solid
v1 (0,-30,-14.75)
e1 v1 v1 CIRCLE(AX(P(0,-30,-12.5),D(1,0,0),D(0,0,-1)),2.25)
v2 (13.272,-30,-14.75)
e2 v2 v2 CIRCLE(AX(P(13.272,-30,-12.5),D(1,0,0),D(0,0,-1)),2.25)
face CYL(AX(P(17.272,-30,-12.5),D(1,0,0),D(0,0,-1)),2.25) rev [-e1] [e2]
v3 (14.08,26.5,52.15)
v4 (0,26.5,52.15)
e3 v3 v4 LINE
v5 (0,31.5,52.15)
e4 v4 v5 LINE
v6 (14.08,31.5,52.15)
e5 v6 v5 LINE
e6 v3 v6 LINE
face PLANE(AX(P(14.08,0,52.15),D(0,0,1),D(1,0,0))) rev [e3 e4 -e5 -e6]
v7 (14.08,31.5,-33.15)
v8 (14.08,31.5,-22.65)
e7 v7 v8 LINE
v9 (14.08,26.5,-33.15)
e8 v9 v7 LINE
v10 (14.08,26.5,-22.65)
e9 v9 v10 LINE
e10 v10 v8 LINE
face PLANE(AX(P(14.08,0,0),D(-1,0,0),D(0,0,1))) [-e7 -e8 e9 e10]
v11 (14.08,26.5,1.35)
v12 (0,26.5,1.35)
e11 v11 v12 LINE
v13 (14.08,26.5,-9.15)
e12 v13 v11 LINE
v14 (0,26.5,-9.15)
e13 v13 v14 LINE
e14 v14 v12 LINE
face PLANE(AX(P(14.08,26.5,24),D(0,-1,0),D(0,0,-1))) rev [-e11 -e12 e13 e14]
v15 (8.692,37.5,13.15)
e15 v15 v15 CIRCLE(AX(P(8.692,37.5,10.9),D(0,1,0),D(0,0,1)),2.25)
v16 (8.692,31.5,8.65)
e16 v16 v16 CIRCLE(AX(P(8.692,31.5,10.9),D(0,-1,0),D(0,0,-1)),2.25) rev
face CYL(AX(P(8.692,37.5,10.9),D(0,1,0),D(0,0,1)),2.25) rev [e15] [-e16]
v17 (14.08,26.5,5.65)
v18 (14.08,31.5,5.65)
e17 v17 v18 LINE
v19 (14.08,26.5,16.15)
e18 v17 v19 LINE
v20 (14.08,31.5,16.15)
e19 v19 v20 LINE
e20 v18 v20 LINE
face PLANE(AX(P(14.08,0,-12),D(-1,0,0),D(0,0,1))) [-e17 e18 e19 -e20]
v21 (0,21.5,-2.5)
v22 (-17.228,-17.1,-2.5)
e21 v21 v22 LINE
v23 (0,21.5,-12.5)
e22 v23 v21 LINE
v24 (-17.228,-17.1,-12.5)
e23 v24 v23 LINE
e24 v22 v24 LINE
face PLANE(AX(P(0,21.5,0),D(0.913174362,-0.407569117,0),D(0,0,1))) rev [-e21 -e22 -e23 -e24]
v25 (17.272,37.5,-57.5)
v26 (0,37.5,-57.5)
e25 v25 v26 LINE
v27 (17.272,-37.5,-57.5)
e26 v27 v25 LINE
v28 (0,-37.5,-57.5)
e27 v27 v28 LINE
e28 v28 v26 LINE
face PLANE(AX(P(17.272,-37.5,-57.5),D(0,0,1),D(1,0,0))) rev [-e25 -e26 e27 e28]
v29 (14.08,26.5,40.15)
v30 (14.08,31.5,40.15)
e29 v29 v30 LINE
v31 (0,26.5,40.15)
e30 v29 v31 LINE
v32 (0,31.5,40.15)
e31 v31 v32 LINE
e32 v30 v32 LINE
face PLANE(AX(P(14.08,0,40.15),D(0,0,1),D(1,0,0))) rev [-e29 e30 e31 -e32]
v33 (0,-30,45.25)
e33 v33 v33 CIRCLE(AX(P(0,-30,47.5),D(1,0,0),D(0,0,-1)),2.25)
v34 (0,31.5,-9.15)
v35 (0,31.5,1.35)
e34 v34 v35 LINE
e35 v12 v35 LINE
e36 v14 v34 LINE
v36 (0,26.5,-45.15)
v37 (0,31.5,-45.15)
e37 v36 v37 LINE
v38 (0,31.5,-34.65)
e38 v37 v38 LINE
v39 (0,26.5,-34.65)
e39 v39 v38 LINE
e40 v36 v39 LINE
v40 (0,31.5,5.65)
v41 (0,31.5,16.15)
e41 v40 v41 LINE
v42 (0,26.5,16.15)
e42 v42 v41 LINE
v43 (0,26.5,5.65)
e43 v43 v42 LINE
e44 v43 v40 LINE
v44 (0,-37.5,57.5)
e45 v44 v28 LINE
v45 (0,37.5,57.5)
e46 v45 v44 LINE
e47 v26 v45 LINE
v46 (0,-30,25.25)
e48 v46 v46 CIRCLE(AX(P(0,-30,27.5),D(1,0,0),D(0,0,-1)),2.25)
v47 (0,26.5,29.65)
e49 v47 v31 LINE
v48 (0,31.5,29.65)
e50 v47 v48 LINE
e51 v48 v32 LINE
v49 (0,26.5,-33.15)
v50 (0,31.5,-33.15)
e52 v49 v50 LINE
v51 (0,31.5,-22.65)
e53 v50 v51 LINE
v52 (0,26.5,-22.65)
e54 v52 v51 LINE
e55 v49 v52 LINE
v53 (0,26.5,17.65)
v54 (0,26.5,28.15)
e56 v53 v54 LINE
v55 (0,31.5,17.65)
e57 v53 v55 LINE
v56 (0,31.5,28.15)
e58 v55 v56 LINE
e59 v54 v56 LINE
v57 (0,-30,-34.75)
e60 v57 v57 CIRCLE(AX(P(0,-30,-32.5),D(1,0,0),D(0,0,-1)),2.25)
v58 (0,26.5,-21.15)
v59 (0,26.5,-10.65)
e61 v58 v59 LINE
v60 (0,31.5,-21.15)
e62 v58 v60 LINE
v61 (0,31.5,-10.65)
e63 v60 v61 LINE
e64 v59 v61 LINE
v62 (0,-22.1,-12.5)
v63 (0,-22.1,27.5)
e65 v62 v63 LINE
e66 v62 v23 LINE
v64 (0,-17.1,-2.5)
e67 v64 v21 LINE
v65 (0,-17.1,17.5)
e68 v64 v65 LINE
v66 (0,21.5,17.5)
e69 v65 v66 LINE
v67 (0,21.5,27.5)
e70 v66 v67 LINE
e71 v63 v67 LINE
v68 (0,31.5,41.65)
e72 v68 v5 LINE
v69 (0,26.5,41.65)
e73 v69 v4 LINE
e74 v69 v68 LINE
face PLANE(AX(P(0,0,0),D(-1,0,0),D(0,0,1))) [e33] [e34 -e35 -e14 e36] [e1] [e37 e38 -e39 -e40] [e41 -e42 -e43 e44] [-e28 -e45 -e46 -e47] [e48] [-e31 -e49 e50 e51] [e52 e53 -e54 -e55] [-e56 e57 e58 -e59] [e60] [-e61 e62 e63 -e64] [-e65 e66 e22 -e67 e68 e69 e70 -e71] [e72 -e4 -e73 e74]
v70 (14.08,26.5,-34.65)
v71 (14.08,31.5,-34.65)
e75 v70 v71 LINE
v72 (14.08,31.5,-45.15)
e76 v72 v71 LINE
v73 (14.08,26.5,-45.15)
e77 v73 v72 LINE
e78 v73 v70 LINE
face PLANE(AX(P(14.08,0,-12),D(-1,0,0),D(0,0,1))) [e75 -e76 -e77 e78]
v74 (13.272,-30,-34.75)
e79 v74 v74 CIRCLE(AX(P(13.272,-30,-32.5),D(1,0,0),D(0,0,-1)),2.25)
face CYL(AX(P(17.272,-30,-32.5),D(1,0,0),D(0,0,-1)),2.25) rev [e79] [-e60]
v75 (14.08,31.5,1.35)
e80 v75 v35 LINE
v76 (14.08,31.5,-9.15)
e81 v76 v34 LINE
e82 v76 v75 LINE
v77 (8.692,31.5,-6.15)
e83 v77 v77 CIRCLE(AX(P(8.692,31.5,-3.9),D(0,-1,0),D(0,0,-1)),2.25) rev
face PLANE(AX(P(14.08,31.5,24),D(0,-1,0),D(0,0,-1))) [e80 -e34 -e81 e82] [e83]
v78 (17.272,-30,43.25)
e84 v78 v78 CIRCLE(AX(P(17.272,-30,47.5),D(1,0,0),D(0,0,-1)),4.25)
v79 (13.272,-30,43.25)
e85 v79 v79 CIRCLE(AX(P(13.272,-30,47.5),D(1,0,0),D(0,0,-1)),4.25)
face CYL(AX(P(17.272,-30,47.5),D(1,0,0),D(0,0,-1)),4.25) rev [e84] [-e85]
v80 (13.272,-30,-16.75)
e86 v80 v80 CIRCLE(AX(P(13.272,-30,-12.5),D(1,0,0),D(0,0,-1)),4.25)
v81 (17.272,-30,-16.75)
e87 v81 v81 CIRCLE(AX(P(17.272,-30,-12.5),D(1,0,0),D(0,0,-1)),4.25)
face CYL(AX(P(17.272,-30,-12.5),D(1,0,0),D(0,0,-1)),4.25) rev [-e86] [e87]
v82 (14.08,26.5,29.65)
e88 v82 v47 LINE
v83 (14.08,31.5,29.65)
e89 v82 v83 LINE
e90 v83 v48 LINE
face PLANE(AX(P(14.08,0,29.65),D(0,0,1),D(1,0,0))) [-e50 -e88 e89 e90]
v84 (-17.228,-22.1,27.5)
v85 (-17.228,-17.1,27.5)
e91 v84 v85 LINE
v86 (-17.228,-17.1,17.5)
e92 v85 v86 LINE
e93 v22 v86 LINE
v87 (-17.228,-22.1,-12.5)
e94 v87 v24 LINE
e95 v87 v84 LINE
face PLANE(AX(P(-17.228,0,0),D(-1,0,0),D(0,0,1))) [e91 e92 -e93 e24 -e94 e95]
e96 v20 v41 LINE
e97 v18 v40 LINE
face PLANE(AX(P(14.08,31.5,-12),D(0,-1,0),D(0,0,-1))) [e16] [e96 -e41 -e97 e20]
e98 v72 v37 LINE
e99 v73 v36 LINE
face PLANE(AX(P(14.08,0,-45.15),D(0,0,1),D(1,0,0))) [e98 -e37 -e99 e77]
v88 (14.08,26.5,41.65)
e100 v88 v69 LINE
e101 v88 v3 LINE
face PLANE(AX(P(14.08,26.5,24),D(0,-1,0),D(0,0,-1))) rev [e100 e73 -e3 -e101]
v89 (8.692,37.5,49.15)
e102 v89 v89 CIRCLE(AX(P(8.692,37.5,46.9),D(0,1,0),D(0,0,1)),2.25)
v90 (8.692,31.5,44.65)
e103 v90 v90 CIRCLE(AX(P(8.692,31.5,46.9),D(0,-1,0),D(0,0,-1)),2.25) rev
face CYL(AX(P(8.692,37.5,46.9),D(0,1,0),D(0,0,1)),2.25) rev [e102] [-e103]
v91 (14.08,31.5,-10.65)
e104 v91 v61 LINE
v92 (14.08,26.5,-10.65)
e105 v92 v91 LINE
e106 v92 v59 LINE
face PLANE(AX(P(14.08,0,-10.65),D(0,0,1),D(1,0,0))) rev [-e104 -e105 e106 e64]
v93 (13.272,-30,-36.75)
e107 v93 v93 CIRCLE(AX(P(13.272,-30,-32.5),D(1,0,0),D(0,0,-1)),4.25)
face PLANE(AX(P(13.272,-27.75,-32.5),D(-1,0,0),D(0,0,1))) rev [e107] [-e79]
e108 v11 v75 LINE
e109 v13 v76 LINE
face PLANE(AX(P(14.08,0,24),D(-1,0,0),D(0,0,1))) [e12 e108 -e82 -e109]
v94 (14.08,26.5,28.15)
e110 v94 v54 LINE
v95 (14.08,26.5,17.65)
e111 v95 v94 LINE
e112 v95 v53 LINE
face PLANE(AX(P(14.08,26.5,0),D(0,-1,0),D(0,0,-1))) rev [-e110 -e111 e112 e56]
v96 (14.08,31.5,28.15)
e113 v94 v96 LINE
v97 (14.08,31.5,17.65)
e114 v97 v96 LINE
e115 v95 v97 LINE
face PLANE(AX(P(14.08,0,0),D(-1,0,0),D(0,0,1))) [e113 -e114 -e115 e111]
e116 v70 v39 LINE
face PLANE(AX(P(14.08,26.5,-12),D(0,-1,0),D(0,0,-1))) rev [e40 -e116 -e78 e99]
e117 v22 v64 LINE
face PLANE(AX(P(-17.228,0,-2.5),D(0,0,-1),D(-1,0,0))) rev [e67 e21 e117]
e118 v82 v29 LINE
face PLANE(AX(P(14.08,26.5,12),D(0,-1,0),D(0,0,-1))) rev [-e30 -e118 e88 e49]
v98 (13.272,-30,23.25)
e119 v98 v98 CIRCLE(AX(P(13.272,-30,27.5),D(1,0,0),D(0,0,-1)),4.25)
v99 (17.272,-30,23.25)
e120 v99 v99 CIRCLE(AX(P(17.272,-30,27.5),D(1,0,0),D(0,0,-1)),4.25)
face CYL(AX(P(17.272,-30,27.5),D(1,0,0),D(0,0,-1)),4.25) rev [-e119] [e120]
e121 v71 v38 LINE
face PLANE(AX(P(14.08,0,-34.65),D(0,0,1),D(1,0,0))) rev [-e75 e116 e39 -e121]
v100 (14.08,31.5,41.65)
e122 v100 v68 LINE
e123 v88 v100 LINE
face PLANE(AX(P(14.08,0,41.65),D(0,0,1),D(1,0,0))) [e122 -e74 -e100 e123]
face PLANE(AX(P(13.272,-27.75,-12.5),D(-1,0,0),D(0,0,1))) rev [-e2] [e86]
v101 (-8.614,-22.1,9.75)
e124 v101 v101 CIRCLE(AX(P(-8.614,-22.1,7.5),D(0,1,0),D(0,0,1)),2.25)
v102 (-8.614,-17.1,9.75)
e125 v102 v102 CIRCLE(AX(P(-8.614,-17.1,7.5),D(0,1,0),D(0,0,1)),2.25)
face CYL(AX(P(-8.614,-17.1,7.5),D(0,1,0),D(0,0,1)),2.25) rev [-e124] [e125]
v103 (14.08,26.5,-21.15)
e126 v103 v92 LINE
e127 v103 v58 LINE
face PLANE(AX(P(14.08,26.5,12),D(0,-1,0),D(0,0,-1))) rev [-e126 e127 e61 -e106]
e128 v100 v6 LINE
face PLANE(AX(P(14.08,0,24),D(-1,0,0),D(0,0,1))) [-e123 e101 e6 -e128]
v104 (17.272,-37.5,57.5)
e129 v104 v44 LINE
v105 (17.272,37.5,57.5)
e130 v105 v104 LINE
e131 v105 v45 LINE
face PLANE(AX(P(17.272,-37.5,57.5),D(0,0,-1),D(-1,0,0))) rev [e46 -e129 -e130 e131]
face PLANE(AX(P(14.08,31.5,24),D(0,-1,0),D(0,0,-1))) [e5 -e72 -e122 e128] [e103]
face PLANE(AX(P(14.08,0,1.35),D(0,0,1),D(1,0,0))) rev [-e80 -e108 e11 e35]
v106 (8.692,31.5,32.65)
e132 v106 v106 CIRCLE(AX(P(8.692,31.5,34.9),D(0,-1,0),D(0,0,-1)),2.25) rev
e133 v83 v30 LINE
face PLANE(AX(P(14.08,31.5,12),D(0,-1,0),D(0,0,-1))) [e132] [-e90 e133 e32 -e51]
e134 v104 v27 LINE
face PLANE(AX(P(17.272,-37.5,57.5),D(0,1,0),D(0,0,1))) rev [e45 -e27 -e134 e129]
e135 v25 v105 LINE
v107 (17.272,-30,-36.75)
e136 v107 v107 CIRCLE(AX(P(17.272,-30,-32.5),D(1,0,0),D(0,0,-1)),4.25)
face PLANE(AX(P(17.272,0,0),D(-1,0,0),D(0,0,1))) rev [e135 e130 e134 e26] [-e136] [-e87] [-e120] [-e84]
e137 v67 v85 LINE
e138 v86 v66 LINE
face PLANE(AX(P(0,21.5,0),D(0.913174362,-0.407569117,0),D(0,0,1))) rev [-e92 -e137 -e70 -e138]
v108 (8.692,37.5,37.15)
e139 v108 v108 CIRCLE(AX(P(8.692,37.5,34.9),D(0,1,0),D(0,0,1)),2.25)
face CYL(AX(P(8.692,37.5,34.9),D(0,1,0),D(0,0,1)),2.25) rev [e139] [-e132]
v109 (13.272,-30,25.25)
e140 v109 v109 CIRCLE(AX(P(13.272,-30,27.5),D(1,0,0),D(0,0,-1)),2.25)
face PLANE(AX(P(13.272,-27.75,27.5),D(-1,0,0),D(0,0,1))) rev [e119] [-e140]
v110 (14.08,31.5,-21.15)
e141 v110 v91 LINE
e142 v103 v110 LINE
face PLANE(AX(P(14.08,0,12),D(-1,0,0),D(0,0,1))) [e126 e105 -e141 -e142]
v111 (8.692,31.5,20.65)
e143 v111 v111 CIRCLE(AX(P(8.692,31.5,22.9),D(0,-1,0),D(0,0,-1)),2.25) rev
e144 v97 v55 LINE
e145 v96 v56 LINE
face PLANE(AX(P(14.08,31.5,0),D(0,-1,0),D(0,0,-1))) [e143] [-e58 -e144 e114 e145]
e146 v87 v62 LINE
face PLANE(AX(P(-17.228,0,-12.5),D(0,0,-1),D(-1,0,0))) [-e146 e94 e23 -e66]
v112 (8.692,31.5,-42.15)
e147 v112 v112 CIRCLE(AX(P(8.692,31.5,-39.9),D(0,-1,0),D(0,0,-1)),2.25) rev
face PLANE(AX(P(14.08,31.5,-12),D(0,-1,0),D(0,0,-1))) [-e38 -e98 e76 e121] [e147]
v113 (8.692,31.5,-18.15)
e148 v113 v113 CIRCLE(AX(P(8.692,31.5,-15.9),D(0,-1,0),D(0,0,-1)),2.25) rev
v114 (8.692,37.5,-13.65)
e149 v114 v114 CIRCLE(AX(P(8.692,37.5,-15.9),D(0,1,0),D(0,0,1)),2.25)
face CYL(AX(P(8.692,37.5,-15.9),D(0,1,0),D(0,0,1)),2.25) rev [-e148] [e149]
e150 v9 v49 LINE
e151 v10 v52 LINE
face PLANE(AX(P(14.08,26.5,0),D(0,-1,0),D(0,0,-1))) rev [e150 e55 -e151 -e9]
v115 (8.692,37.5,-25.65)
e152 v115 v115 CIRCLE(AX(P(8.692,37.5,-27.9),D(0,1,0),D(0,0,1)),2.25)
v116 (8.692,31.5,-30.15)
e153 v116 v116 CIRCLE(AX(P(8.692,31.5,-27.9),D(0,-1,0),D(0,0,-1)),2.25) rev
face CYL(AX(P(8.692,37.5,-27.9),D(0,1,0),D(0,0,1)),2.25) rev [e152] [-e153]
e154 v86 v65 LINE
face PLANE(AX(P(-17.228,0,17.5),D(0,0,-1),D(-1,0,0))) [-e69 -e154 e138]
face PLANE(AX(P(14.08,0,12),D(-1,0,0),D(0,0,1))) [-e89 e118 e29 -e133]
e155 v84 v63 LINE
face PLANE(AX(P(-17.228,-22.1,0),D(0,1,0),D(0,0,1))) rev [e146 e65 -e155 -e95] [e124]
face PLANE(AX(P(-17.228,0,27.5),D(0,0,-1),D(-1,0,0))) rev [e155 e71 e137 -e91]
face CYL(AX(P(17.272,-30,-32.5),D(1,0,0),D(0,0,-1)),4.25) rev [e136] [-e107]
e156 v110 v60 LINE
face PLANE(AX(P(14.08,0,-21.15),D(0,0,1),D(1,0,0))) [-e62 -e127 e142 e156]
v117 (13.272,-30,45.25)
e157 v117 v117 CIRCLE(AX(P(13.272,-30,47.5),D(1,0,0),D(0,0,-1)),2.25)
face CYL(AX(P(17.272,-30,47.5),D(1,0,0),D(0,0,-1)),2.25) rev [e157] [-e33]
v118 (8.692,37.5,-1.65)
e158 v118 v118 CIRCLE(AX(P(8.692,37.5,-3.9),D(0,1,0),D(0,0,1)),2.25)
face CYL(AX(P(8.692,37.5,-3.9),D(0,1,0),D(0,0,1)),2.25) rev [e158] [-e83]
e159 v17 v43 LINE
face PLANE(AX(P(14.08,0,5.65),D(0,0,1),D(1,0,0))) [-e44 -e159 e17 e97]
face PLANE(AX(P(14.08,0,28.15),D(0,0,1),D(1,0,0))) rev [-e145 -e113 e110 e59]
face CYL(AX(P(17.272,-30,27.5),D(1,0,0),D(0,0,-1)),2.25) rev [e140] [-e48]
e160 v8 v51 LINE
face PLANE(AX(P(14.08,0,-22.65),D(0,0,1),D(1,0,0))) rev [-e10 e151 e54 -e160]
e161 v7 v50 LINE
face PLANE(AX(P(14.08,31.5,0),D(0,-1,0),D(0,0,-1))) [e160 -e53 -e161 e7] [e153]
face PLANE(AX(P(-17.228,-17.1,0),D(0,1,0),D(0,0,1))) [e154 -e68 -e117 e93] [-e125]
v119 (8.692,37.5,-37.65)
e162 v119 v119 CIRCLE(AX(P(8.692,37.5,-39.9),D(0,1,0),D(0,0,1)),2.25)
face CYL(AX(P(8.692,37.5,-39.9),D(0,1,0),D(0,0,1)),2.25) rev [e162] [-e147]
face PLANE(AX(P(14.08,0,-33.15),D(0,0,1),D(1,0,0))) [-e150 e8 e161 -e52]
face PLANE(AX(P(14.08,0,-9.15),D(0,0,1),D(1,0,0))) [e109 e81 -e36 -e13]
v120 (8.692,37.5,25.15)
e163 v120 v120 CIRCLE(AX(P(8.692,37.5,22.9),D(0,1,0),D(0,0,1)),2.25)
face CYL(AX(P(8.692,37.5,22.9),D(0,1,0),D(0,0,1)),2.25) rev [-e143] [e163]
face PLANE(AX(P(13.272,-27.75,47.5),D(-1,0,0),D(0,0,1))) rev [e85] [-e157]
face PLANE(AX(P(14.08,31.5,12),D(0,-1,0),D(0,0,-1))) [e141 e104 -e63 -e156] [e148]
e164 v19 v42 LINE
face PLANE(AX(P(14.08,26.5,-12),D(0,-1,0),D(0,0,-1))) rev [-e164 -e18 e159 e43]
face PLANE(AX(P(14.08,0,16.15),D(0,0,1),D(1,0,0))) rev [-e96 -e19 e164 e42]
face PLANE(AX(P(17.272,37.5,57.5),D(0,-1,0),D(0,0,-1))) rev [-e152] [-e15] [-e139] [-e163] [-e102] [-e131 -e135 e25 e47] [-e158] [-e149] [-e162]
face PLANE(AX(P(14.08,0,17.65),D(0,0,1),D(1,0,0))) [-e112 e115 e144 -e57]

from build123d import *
from OCP.BRepFilletAPI import BRepFilletAPI_MakeChamfer

# Parameters (mm, degrees)
SKETCH1_W                               = 115
SKETCH1_H                               = 75
BOSS_EXTRUDE1_DEPTH                     = 17.272
M4_CLEARANCE_HOLE1_AT_2_COUNT           = 2
M4_CLEARANCE_HOLE1_AT_2_PITCH           = 50.8
SKETCH5_W                               = 10.5
SKETCH5_H                               = 5
CUT_EXTRUDE1_DEPTH                      = 14.08
LPATTERN1_COUNT                         = 2
LPATTERN1_PITCH                         = 12
LPATTERN1_COL_COUNT                     = 3
LPATTERN1_COL_PITCH                     = 12
CBORE_FOR_M5_HEX_HEAD_BOLT1_D           = 4.5
CBORE_FOR_M5_HEX_HEAD_BOLT1_CBORE_D     = 8.5
CBORE_FOR_M5_HEX_HEAD_BOLT1_CBORE_DEPTH = 4
BOSS_EXTRUDE3_DEPTH                     = 17.228
CHAMFER2_SIZE                           = 17.228
CHAMFER2_SIZE_2                         = 38.6
M4_CLEARANCE_HOLE3_D                    = 4.5


with BuildPart() as part:
    # Sketch1 → Boss-Extrude1 (new body)
    with BuildSketch(Plane(origin=(0, 0, 0), x_dir=(0, 0, -1), z_dir=(1, 0, 0))):
        Rectangle(SKETCH1_W, SKETCH1_H)
    extrude(amount=BOSS_EXTRUDE1_DEPTH)

    # Sketch4 → M4 Clearance Hole1 (revolve, cut)
    with BuildSketch(Plane(origin=(8.692, 37.5, 22.9), x_dir=(0, 0, 1), z_dir=(1, 0, 0))):
        Polygon((0, 0), (0, 7.351936393), (2.25, 6), (2.25, 0), align=None)
    m4_clearance_hole1 = revolve(axis=Axis((8.692, 43.85, 22.9), (0, -1, 0)), mode=Mode.SUBTRACT)

    # M4 Clearance Hole1 at 2: M4 Clearance Hole1 ×2
    with Locations(*[(0, 0, -i * M4_CLEARANCE_HOLE1_AT_2_PITCH) for i in range(1, M4_CLEARANCE_HOLE1_AT_2_COUNT)]):
        add(m4_clearance_hole1, mode=Mode.SUBTRACT)

    # Sketch5 → Cut-Extrude1 (cut)
    with BuildSketch(Plane.ZY):
        with Locations((-27.9, 29)):
            Rectangle(SKETCH5_W, SKETCH5_H)
        with Locations((22.9, 29)):
            Rectangle(SKETCH5_W, SKETCH5_H)
    cut_extrude1 = extrude(amount=-CUT_EXTRUDE1_DEPTH, mode=Mode.SUBTRACT)

    # LPattern1: M4 Clearance Hole1, Cut-Extrude1 ×2
    with Locations(*[(0, 0, -i * LPATTERN1_PITCH) for i in range(1, LPATTERN1_COUNT)]):
        add(m4_clearance_hole1, mode=Mode.SUBTRACT)
        add(cut_extrude1, mode=Mode.SUBTRACT)

    # LPattern1 copy 1 sketch → LPattern1 copy 1 (revolve, cut)
    with BuildSketch(Plane(origin=(8.692, 37.5, -39.9), x_dir=(0, 0, 1), z_dir=(1, 0, 0))):
        Polygon((0, 0), (0, 7.351936393), (2.25, 6), (2.25, 0), align=None)
    revolve(axis=Axis((8.692, 43.85, -39.9), (0, -1, 0)), mode=Mode.SUBTRACT)

    # LPattern1 col: M4 Clearance Hole1, Cut-Extrude1 ×3
    with Locations(*[(0, 0, i * LPATTERN1_COL_PITCH) for i in range(1, LPATTERN1_COL_COUNT)]):
        add(m4_clearance_hole1, mode=Mode.SUBTRACT)
        add(cut_extrude1, mode=Mode.SUBTRACT)

    # LPattern1 col copy 1 sketch → LPattern1 col copy 1 (revolve, cut)
    with BuildSketch(Plane(origin=(8.692, 37.5, -15.9), x_dir=(0, 0, 1), z_dir=(1, 0, 0))):
        Polygon((0, 0), (0, 7.351936393), (2.25, 6), (2.25, 0), align=None)
    revolve(axis=Axis((8.692, 43.85, -15.9), (0, -1, 0)), mode=Mode.SUBTRACT)

    # LPattern1 col copy 2 sketch → LPattern1 col copy 2 (revolve, cut)
    with BuildSketch(Plane(origin=(8.692, 37.5, -3.9), x_dir=(0, 0, 1), z_dir=(1, 0, 0))):
        Polygon((0, 0), (0, 7.351936393), (2.25, 6), (2.25, 0), align=None)
    revolve(axis=Axis((8.692, 43.85, -3.9), (0, -1, 0)), mode=Mode.SUBTRACT)

    # CBORE for M5 Hex Head Bolt1 (through all)
    with Locations(Plane(origin=(17.272, 0, 0), x_dir=(0, 0, -1), z_dir=(1, 0, 0))):
        with Locations((32.5, -30), (12.5, -30), (-27.5, -30), (-47.5, -30)):
            CounterBoreHole(CBORE_FOR_M5_HEX_HEAD_BOLT1_D / 2, CBORE_FOR_M5_HEX_HEAD_BOLT1_CBORE_D / 2, CBORE_FOR_M5_HEX_HEAD_BOLT1_CBORE_DEPTH)

    # Sketch12 → Boss-Extrude3 (add)
    with BuildSketch(Plane.ZY):
        Polygon((-12.5, 21.5), (-12.5, -22.1), (27.5, -22.1), (27.5, 21.5), (17.5, 21.5), (17.5, -17.1), (-2.5, -17.1), (-2.5, 21.5), align=None)
    extrude(amount=BOSS_EXTRUDE3_DEPTH)

    # Chamfer2
    chamfer2_edges_1 = [part.edges().sort_by_distance(p)[0] for p in [
        (-17.228, 21.5, -7.5),
    ]]
    chamfer2_side_1 = [part.faces().sort_by_distance(p)[0] for p in [
        (-16.88344, 21.5, -7.5),
    ]]
    chamfer2_edges_2 = [part.edges().sort_by_distance(p)[0] for p in [
        (-17.228, 21.5, 22.5),
    ]]
    chamfer2_side_2 = [part.faces().sort_by_distance(p)[0] for p in [
        (-16.88344, 21.5, 22.5),
    ]]
    chamfer2 = BRepFilletAPI_MakeChamfer(part.part.solid().wrapped)
    for e in chamfer2_edges_1:
        chamfer2.Add(CHAMFER2_SIZE - 0.0001, CHAMFER2_SIZE_2 - 0.0001, e.wrapped, chamfer2_side_1[0].wrapped)
    for e in chamfer2_edges_2:
        chamfer2.Add(CHAMFER2_SIZE - 0.0001, CHAMFER2_SIZE_2 - 0.0001, e.wrapped, chamfer2_side_2[0].wrapped)
    add(Compound.cast(chamfer2.Shape()), mode=Mode.REPLACE)  # a hair under: the kernel refuses the full size

    # M4 Clearance Hole3 (through all)
    with Locations(Plane(origin=(0, -17.1, 0), x_dir=(1, 0, 0), z_dir=(0, 1, 0))):
        with Locations((-8.614, -7.5)):
            Hole(M4_CLEARANCE_HOLE3_D / 2)


solid = part.part
